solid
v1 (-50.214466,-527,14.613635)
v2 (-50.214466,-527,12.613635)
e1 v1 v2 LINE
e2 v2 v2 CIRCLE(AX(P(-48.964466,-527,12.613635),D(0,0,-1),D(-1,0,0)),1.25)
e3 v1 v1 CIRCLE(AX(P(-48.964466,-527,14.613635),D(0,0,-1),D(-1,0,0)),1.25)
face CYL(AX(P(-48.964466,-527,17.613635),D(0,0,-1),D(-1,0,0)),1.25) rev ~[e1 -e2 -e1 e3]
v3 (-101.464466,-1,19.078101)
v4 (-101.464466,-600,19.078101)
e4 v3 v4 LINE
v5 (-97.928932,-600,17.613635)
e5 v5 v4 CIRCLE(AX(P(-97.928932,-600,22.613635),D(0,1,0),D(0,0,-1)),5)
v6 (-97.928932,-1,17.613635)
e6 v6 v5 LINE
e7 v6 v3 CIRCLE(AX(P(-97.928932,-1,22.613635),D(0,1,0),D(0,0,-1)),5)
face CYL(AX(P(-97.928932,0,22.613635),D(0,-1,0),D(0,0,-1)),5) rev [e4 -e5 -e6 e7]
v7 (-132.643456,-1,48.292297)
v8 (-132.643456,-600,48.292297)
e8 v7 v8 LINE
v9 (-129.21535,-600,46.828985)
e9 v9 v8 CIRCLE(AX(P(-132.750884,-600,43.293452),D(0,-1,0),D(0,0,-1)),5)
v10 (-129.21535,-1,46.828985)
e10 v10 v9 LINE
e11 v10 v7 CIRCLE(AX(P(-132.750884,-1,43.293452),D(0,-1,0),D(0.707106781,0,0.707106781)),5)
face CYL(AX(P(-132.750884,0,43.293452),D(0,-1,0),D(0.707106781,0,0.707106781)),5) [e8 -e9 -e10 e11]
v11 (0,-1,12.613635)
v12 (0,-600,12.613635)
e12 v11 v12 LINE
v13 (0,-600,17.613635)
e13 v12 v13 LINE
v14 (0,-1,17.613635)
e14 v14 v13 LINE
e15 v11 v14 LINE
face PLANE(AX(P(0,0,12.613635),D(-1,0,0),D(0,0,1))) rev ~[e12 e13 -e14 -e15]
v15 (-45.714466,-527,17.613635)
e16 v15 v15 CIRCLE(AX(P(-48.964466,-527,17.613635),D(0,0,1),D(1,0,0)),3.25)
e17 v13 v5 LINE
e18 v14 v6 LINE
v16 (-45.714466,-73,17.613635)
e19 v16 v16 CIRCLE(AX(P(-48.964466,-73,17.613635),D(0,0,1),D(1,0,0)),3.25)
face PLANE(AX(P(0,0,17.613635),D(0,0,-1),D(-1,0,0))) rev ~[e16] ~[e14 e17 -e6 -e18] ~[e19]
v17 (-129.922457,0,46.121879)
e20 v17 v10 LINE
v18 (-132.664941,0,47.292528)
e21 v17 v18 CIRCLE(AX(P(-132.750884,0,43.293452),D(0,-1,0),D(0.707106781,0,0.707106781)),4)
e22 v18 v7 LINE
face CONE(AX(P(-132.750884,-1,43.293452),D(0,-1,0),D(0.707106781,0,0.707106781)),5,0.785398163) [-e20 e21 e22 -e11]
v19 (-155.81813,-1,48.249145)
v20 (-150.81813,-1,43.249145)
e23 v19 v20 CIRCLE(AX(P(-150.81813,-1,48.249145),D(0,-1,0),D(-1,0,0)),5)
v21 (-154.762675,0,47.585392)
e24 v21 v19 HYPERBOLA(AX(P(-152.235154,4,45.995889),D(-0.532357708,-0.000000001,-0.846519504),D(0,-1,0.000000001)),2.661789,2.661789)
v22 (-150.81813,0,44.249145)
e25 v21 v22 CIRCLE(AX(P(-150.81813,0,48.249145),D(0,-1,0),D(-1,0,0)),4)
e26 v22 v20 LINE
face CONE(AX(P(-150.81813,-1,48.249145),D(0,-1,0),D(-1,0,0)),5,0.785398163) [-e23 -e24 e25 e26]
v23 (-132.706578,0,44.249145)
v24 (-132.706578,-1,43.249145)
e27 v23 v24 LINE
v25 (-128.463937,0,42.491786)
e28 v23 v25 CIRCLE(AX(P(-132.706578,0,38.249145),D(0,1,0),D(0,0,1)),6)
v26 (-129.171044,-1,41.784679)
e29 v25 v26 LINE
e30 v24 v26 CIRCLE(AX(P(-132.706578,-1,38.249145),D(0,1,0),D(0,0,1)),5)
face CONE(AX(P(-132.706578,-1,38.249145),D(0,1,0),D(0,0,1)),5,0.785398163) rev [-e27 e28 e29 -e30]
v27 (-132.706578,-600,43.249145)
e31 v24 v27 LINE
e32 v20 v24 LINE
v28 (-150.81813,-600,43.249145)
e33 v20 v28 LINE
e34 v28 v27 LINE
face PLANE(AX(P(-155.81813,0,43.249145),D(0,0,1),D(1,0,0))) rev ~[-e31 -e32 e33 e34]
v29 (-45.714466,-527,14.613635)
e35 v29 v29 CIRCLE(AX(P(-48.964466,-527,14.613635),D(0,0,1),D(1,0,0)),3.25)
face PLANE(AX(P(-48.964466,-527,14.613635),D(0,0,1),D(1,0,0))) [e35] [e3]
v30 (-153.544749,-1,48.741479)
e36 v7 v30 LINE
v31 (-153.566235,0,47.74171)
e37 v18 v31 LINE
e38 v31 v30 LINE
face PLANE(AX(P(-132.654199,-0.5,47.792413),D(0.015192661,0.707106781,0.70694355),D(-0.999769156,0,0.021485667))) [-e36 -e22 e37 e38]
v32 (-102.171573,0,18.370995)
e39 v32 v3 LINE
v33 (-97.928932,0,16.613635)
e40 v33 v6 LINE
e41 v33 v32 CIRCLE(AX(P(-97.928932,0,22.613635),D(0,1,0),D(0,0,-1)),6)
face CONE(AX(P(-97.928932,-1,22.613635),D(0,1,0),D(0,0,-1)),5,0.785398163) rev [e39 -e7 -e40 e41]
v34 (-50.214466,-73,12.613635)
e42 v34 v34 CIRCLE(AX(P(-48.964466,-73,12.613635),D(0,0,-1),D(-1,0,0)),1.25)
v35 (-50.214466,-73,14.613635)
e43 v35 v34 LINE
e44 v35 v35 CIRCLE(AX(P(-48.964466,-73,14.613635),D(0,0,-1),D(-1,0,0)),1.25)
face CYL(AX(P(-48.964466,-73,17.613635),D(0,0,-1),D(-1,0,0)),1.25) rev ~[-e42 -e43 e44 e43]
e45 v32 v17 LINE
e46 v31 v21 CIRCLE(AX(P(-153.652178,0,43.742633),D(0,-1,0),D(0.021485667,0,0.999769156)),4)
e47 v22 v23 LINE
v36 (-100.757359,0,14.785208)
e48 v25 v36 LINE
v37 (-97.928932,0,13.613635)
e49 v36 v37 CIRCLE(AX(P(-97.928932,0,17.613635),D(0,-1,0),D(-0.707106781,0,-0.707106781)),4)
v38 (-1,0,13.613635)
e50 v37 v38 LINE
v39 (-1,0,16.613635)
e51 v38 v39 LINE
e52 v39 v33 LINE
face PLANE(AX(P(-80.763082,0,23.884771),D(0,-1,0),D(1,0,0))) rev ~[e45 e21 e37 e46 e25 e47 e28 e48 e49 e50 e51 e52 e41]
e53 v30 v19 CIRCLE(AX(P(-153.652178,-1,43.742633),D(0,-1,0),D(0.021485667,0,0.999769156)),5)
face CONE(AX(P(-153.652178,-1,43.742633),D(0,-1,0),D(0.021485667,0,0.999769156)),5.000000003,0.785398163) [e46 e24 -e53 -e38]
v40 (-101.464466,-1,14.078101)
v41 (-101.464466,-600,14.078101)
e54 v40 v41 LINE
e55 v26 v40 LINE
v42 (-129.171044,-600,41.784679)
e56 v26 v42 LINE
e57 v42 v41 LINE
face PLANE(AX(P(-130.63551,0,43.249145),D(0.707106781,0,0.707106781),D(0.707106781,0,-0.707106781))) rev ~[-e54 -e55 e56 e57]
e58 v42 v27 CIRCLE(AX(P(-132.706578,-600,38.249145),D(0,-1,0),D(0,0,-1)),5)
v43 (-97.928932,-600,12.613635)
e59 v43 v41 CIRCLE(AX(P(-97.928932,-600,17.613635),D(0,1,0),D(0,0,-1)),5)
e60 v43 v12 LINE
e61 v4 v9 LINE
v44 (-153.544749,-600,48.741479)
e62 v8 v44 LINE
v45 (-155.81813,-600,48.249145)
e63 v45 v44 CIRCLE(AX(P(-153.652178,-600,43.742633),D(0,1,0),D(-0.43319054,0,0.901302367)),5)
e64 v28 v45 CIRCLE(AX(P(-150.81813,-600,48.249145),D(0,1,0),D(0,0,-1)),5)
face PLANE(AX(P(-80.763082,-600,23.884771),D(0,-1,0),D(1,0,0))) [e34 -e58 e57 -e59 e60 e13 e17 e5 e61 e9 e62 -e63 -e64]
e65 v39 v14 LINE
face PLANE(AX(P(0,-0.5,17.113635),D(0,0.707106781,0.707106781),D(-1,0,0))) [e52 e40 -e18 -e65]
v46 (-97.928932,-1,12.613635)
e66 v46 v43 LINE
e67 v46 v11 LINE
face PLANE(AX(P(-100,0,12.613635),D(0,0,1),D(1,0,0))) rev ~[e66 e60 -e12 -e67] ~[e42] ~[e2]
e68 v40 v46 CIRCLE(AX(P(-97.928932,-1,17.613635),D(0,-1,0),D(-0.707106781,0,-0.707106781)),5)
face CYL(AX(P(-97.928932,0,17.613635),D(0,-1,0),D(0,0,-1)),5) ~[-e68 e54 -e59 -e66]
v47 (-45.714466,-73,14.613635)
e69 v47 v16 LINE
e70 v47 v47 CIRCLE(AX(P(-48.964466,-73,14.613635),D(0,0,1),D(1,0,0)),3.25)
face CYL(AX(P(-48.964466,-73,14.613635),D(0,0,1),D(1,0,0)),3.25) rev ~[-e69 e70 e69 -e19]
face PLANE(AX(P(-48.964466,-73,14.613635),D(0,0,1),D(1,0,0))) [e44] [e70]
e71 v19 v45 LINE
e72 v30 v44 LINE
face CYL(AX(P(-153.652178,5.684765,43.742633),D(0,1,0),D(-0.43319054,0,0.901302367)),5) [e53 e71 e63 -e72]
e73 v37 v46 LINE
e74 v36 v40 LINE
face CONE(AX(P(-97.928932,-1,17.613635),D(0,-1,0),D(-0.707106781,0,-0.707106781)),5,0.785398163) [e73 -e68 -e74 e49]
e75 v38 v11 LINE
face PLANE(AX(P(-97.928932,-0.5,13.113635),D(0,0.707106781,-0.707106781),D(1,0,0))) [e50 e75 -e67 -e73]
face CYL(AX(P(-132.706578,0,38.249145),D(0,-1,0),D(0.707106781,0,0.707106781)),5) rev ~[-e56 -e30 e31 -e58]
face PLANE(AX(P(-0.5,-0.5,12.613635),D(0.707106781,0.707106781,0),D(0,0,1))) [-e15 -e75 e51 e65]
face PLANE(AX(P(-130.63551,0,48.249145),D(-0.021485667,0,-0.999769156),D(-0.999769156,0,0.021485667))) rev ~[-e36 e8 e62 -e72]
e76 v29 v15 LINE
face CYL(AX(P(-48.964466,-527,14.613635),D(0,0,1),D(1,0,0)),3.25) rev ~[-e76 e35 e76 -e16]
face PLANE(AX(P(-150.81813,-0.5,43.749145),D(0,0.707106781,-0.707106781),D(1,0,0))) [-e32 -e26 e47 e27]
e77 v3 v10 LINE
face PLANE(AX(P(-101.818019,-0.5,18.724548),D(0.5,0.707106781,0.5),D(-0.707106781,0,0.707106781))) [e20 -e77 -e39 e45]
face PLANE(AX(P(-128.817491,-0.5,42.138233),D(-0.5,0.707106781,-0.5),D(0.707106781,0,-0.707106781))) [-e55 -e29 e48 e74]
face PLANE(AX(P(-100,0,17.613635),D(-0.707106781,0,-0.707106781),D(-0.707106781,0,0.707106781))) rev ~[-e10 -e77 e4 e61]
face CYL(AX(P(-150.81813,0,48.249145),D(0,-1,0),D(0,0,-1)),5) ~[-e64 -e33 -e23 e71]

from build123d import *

# Parameters (mm, degrees)
F1_DEPTH       = 600
F2_R           = 5
F3_R           = 5
F4_T1_DEPTH    = 611.3695297687
F5_SIZE        = 1
F7_D           = 2.5
F7_CBORE_D     = 6.5
F7_CBORE_DEPTH = 3


# Not quite as in the source:
# - a fillet or chamfer that OpenCascade refuses, or shapes differently, is made with other operations: its cross-section is extruded or revolved along the edge and cut away or added


with BuildPart() as f1:
    # F0 (on Front) → F1 (new body)
    with BuildSketch(Plane.XZ):
        Polygon((-100, 12.6136353192), (0, 12.6136353192), (0, 17.5048394176), (0, 17.6136353192), (-100, 17.6136353192), (-125.63551, 43.2491453192), (-130.63551, 48.2491453192), (-155.818130374, 48.7903356552), (-155.818130374, 43.2491453192), (-130.63551, 43.2491453192), align=None)
    extrude(amount=F1_DEPTH)

    # F2
    f2_edges = [f1.edges().sort_by_distance(p)[0] for p in [
        (-130.63551, -300, 48.249145),
        (-100, -300, 17.613635),
    ]]
    fillet(f2_edges, radius=F2_R)

    # F3
    f3_edges = [f1.edges().sort_by_distance(p)[0] for p in [
        (-130.63551, -300, 43.249145),
        (-100, -300, 12.613635),
        (-155.81813, -300, 43.249145),
    ]]
    fillet(f3_edges, radius=F3_R)

    # F4: fillet of radius 5 on 1 edges, made by hand

    # F4_s2 → F4_t1 (cut)
    with BuildSketch(Plane.XZ.offset(-5.6847648844)):
        with BuildLine():
            ThreePointArc((-155.818130374, 48.2491453192), (-154.7104681905, 48.6293523426), (-153.5447493368, 48.7414792682))
            Line((-153.5447493368, 48.7414792682), (-155.818130374, 48.7903356552))
            Line((-155.818130374, 48.7903356552), (-155.818130374, 48.2491453192))
        make_face()
    extrude(amount=F4_T1_DEPTH, mode=Mode.SUBTRACT)

    # F5
    f5_edges = [f1.edges().sort_by_distance(p)[0] for p in [
        (-48.964466, 0, 17.613635),
        (-48.964466, 0, 12.613635),
        (-115.317755, 0, 27.93139),
        (-130.793161, 0, 42.868543),
        (-141.762354, 0, 43.249145),
        (-154.353664, 0, 44.713611),
        (-143.094103, 0, 48.516888),
        (-130.787949, 0, 47.892026),
        (-154.710468, 0, 48.629352),
        (-99.842349, 0, 12.994238),
        (-99.842349, 0, 17.994238),
        (-115.339908, 0, 32.953543),
        (0, 0, 15.113635),
    ]]
    chamfer(f5_edges, length=F5_SIZE)

    # F7 (through all)
    with Locations(Plane.XY.offset(17.6136353192)):
        with Locations((-48.9644660941, -73), (-48.9644660941, -527)):
            CounterBoreHole(F7_D / 2, F7_CBORE_D / 2, F7_CBORE_DEPTH)


solid = f1.part
